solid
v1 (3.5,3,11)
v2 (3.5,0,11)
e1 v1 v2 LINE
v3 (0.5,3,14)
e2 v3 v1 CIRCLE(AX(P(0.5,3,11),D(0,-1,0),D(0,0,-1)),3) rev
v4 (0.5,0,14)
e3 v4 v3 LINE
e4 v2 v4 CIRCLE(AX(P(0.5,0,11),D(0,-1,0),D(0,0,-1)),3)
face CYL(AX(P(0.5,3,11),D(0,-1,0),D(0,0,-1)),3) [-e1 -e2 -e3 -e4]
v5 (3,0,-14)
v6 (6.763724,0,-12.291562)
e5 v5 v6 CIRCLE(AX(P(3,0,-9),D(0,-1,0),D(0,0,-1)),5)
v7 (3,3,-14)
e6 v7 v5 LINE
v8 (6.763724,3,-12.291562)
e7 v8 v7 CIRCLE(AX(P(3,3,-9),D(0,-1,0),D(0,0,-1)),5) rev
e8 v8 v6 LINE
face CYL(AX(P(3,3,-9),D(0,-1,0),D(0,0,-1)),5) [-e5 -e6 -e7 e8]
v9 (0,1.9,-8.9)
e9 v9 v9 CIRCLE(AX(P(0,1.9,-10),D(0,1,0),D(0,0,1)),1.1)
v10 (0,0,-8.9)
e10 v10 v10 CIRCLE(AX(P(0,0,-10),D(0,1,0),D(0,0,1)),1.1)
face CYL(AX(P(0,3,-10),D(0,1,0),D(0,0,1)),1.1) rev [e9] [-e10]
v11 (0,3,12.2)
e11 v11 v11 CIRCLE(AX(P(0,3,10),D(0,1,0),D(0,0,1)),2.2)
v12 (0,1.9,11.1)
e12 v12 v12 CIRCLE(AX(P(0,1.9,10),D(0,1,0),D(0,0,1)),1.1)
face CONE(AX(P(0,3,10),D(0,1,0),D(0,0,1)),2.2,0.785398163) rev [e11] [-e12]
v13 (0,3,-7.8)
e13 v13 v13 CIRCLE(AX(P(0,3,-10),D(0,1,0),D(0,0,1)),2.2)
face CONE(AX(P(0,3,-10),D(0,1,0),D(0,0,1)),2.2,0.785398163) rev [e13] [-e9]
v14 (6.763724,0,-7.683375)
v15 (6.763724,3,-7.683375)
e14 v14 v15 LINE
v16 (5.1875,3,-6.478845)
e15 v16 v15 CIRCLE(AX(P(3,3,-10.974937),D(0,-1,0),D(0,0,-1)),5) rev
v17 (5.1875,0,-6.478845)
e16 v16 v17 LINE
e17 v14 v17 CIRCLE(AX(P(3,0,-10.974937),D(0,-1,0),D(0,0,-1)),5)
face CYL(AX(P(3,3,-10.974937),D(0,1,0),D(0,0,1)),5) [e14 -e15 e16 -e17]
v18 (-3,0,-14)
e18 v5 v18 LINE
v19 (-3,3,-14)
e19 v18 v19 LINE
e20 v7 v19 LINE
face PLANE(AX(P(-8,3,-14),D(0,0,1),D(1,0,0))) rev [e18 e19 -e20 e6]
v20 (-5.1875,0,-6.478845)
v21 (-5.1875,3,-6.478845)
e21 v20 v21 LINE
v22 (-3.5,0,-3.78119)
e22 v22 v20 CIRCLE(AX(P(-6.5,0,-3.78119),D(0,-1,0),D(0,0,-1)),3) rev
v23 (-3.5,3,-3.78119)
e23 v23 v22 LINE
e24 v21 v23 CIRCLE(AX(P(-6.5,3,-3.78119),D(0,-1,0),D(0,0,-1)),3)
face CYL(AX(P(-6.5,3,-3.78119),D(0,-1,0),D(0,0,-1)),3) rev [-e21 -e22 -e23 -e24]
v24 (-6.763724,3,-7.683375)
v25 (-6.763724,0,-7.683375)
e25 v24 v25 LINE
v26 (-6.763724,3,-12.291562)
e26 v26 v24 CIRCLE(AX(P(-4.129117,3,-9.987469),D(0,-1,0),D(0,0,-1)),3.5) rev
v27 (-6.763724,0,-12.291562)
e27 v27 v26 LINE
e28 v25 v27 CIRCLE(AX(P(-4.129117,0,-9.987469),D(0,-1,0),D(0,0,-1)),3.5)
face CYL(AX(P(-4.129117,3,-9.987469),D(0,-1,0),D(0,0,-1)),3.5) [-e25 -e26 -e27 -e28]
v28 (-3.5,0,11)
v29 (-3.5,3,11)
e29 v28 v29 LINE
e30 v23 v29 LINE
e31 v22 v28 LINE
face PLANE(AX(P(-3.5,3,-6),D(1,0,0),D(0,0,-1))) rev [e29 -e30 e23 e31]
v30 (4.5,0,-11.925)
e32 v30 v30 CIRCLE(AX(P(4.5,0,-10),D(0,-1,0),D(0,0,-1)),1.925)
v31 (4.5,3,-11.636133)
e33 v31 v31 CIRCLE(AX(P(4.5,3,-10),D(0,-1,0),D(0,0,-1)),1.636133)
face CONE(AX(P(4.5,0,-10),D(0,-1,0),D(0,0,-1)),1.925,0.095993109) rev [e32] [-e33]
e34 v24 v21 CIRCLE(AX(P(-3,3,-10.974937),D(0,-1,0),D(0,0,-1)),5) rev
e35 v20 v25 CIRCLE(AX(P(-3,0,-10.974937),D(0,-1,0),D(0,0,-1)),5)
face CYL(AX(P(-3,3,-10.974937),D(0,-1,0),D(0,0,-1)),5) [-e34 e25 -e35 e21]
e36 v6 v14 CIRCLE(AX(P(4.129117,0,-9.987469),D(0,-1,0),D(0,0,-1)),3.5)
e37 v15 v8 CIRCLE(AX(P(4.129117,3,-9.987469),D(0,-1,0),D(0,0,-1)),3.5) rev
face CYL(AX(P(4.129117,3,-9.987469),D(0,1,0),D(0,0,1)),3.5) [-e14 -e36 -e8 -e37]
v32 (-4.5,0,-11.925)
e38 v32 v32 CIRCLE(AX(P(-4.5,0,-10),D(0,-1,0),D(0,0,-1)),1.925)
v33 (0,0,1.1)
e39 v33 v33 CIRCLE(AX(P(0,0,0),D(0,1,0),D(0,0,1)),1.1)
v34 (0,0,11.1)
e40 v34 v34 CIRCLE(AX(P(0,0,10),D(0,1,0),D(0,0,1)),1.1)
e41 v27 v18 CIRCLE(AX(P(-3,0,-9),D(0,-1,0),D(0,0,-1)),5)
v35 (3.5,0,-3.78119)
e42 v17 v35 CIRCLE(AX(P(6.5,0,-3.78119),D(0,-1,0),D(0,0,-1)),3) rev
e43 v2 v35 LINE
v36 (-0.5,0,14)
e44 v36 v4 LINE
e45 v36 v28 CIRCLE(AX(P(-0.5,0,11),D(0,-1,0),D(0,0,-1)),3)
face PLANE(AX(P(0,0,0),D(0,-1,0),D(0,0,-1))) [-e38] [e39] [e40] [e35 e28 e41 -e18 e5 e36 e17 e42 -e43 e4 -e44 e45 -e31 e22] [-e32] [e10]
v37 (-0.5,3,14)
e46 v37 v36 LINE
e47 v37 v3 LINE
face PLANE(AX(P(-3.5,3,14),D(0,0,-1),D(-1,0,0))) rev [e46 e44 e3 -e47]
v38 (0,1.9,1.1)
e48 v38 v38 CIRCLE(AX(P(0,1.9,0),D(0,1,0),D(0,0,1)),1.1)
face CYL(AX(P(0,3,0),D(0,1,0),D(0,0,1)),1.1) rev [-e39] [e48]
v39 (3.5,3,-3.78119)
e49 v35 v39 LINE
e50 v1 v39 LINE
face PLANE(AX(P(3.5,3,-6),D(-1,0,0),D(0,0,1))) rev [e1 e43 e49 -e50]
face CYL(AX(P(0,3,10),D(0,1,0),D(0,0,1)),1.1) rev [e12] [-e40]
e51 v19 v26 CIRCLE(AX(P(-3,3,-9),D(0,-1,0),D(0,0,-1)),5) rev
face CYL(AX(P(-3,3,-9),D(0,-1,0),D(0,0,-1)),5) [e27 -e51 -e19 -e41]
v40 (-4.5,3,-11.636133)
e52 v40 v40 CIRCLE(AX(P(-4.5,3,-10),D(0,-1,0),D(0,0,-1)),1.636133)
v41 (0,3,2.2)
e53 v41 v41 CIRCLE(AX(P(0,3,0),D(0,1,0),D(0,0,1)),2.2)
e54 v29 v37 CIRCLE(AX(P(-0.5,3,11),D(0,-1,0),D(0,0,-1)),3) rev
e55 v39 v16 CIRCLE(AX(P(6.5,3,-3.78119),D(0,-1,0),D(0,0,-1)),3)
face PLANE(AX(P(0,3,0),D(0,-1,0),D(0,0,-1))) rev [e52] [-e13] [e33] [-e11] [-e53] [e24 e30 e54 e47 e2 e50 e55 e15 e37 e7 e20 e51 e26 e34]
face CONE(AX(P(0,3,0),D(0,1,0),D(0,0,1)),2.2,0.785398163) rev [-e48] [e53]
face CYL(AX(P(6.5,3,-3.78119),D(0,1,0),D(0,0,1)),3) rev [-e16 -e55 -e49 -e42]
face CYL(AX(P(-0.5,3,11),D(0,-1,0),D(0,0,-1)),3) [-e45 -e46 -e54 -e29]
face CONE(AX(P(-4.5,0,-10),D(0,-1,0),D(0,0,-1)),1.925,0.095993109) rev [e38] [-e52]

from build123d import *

# Parameters (mm, degrees)
BOSS_EXTRUDE1_DEPTH                                 = 3
CSK_FOR_M2_COUNTERSUNK_FLAT_HEAD_SCREW3_D           = 2.2
CSK_FOR_M2_COUNTERSUNK_FLAT_HEAD_SCREW3_DEPTH       = 3
CSK_FOR_M2_COUNTERSUNK_FLAT_HEAD_SCREW3_CSINK_D     = 4.4
CSK_FOR_M2_COUNTERSUNK_FLAT_HEAD_SCREW3_CSINK_ANGLE = 90
CSK_FOR_M2_COUNTERSUNK_FLAT_HEAD_SCREW3_TIP         = 0.660946681
FILLET1_R                                           = 5
FILLET2_R                                           = 3.5
FILLET3_R                                           = 3
CSK_FOR_M2_COUNTERSUNK_FLAT_HEAD_SCR_2_COUNT        = 2
CSK_FOR_M2_COUNTERSUNK_FLAT_HEAD_SCR_2_PITCH        = 9


with BuildPart() as part:
    # Sketch1 → Boss-Extrude1 (new body)
    with BuildSketch(Plane(origin=(0, 0, 0), x_dir=(1, 0, 0), z_dir=(0, 1, 0))):
        Polygon((3.5, 6), (8, 6), (8, 14), (-8, 14), (-8, 6), (-3.5, 6), (-3.5, -14), (3.5, -14), align=None)
    extrude(amount=BOSS_EXTRUDE1_DEPTH)

    # CSK for M2 Countersunk Flat Head Screw3
    with Locations(Plane(origin=(0, 3, 0), x_dir=(1, 0, 0), z_dir=(0, 1, 0))):
        with Locations((0, 10), (0, 0), (0, -10)):
            CounterSinkHole(CSK_FOR_M2_COUNTERSUNK_FLAT_HEAD_SCREW3_D / 2, CSK_FOR_M2_COUNTERSUNK_FLAT_HEAD_SCREW3_CSINK_D / 2, depth=CSK_FOR_M2_COUNTERSUNK_FLAT_HEAD_SCREW3_DEPTH, counter_sink_angle=CSK_FOR_M2_COUNTERSUNK_FLAT_HEAD_SCREW3_CSINK_ANGLE)
            with Locations((0, 0, -(CSK_FOR_M2_COUNTERSUNK_FLAT_HEAD_SCREW3_DEPTH + CSK_FOR_M2_COUNTERSUNK_FLAT_HEAD_SCREW3_TIP / 2))):  # 118° drill point
                Cone(0, CSK_FOR_M2_COUNTERSUNK_FLAT_HEAD_SCREW3_D / 2, CSK_FOR_M2_COUNTERSUNK_FLAT_HEAD_SCREW3_TIP, mode=Mode.SUBTRACT)

    # Fillet1
    # the kernel refuses this fillet: 5 mm, written as the material it takes off along each edge
    with BuildSketch(Plane(origin=(-8, -12.437342964, -6), x_dir=(1, 0, 0), z_dir=(0, 1, 0))) as fillet1_piece_1:
        with BuildLine():
            CenterArc((5, 4.974937186), FILLET1_R, 180, 84.260829523)
            Line((0, 4.974937186), (-0.1, 4.974937186))
            Line((-0.1, 4.974937186), (-0.1, 0))
            Line((-0.1, 0), (0, -0.1))
            ThreePointArc((0, -0.1), (2.25, -0.1), (4.49, -0.099498744))
            Line((4.49, -0.099498744), (4.5, 0))
        make_face()
    extrude(amount=27.874685928, mode=Mode.SUBTRACT)
    with BuildSketch(Plane(origin=(-8, -12.5, -14), x_dir=(0, 0, 1), z_dir=(0, 1, 0)), Plane(origin=(8, -12.5, -14), x_dir=(-1, 0, 0), z_dir=(0, 1, 0))) as fillet1_piece_2:
        with BuildLine():
            CenterArc((FILLET1_R, FILLET1_R), FILLET1_R, 180, 90)
            Line((0, FILLET1_R), (-FILLET1_R * 0.02, FILLET1_R))
            Line((-FILLET1_R * 0.02, FILLET1_R), (-FILLET1_R * 0.02, -FILLET1_R * 0.02))
            Line((-FILLET1_R * 0.02, -FILLET1_R * 0.02), (FILLET1_R, -FILLET1_R * 0.02))
            Line((FILLET1_R, -FILLET1_R * 0.02), (FILLET1_R, 0))
        make_face()
    extrude(amount=28, mode=Mode.SUBTRACT)
    with BuildSketch(Plane(origin=(8, -12.437342964, -6), x_dir=(-1, 0, 0), z_dir=(0, 1, 0))) as fillet1_piece_3:
        with BuildLine():
            CenterArc((5, -4.974937186), FILLET1_R, 95.739170477, 84.260829523)
            Line((0, -4.974937186), (-0.1, -4.974937186))
            Line((-0.1, -4.974937186), (-0.1, 0))
            Line((-0.1, 0), (0, 0.1))
            ThreePointArc((0, 0.1), (2.25, 0.1), (4.49, 0.099498744))
            Line((4.49, 0.099498744), (4.5, 0))
        make_face()
    extrude(amount=27.874685928, mode=Mode.SUBTRACT)

    # Fillet2
    fillet2_edges = [part.edges().sort_by_distance(p)[0] for p in [
        (-7.901520762, 1.5, -9.987468593),
        (7.901520762, 1.5, -9.987468593),
    ]]
    fillet(fillet2_edges, radius=FILLET2_R)

    # Fillet3
    fillet3_edges = [part.edges().sort_by_distance(p)[0] for p in [
        (3.5, 1.5, -6),
        (3.5, 1.5, 14),
        (-3.5, 1.5, 14),
        (-3.5, 1.5, -6),
    ]]
    fillet(fillet3_edges, radius=FILLET3_R)

    # Sketch8 → CSK for M2 Countersunk Flat Head Screw2 (revolve, cut)
    with BuildSketch(Plane(origin=(-4.5, 0, -10), x_dir=(0, 0, -1), z_dir=(1, 0, 0))):
        Polygon((0, 0), (0, 3), (1.6, 3), (1.6, 3.375254051), (1.925, 0), align=None)
    csk_for_m2_countersunk_flat_head_screw2 = revolve(axis=Axis((-4.5, -6.35, -10), (0, 1, 0)), mode=Mode.SUBTRACT)

    # CSK for M2 Countersunk Flat Head Scr 2: CSK for M2 Countersunk Flat Head Screw2 ×2
    with Locations(*[(i * CSK_FOR_M2_COUNTERSUNK_FLAT_HEAD_SCR_2_PITCH, 0, 0) for i in range(1, CSK_FOR_M2_COUNTERSUNK_FLAT_HEAD_SCR_2_COUNT)]):
        add(csk_for_m2_countersunk_flat_head_screw2, mode=Mode.SUBTRACT)


solid = part.part
